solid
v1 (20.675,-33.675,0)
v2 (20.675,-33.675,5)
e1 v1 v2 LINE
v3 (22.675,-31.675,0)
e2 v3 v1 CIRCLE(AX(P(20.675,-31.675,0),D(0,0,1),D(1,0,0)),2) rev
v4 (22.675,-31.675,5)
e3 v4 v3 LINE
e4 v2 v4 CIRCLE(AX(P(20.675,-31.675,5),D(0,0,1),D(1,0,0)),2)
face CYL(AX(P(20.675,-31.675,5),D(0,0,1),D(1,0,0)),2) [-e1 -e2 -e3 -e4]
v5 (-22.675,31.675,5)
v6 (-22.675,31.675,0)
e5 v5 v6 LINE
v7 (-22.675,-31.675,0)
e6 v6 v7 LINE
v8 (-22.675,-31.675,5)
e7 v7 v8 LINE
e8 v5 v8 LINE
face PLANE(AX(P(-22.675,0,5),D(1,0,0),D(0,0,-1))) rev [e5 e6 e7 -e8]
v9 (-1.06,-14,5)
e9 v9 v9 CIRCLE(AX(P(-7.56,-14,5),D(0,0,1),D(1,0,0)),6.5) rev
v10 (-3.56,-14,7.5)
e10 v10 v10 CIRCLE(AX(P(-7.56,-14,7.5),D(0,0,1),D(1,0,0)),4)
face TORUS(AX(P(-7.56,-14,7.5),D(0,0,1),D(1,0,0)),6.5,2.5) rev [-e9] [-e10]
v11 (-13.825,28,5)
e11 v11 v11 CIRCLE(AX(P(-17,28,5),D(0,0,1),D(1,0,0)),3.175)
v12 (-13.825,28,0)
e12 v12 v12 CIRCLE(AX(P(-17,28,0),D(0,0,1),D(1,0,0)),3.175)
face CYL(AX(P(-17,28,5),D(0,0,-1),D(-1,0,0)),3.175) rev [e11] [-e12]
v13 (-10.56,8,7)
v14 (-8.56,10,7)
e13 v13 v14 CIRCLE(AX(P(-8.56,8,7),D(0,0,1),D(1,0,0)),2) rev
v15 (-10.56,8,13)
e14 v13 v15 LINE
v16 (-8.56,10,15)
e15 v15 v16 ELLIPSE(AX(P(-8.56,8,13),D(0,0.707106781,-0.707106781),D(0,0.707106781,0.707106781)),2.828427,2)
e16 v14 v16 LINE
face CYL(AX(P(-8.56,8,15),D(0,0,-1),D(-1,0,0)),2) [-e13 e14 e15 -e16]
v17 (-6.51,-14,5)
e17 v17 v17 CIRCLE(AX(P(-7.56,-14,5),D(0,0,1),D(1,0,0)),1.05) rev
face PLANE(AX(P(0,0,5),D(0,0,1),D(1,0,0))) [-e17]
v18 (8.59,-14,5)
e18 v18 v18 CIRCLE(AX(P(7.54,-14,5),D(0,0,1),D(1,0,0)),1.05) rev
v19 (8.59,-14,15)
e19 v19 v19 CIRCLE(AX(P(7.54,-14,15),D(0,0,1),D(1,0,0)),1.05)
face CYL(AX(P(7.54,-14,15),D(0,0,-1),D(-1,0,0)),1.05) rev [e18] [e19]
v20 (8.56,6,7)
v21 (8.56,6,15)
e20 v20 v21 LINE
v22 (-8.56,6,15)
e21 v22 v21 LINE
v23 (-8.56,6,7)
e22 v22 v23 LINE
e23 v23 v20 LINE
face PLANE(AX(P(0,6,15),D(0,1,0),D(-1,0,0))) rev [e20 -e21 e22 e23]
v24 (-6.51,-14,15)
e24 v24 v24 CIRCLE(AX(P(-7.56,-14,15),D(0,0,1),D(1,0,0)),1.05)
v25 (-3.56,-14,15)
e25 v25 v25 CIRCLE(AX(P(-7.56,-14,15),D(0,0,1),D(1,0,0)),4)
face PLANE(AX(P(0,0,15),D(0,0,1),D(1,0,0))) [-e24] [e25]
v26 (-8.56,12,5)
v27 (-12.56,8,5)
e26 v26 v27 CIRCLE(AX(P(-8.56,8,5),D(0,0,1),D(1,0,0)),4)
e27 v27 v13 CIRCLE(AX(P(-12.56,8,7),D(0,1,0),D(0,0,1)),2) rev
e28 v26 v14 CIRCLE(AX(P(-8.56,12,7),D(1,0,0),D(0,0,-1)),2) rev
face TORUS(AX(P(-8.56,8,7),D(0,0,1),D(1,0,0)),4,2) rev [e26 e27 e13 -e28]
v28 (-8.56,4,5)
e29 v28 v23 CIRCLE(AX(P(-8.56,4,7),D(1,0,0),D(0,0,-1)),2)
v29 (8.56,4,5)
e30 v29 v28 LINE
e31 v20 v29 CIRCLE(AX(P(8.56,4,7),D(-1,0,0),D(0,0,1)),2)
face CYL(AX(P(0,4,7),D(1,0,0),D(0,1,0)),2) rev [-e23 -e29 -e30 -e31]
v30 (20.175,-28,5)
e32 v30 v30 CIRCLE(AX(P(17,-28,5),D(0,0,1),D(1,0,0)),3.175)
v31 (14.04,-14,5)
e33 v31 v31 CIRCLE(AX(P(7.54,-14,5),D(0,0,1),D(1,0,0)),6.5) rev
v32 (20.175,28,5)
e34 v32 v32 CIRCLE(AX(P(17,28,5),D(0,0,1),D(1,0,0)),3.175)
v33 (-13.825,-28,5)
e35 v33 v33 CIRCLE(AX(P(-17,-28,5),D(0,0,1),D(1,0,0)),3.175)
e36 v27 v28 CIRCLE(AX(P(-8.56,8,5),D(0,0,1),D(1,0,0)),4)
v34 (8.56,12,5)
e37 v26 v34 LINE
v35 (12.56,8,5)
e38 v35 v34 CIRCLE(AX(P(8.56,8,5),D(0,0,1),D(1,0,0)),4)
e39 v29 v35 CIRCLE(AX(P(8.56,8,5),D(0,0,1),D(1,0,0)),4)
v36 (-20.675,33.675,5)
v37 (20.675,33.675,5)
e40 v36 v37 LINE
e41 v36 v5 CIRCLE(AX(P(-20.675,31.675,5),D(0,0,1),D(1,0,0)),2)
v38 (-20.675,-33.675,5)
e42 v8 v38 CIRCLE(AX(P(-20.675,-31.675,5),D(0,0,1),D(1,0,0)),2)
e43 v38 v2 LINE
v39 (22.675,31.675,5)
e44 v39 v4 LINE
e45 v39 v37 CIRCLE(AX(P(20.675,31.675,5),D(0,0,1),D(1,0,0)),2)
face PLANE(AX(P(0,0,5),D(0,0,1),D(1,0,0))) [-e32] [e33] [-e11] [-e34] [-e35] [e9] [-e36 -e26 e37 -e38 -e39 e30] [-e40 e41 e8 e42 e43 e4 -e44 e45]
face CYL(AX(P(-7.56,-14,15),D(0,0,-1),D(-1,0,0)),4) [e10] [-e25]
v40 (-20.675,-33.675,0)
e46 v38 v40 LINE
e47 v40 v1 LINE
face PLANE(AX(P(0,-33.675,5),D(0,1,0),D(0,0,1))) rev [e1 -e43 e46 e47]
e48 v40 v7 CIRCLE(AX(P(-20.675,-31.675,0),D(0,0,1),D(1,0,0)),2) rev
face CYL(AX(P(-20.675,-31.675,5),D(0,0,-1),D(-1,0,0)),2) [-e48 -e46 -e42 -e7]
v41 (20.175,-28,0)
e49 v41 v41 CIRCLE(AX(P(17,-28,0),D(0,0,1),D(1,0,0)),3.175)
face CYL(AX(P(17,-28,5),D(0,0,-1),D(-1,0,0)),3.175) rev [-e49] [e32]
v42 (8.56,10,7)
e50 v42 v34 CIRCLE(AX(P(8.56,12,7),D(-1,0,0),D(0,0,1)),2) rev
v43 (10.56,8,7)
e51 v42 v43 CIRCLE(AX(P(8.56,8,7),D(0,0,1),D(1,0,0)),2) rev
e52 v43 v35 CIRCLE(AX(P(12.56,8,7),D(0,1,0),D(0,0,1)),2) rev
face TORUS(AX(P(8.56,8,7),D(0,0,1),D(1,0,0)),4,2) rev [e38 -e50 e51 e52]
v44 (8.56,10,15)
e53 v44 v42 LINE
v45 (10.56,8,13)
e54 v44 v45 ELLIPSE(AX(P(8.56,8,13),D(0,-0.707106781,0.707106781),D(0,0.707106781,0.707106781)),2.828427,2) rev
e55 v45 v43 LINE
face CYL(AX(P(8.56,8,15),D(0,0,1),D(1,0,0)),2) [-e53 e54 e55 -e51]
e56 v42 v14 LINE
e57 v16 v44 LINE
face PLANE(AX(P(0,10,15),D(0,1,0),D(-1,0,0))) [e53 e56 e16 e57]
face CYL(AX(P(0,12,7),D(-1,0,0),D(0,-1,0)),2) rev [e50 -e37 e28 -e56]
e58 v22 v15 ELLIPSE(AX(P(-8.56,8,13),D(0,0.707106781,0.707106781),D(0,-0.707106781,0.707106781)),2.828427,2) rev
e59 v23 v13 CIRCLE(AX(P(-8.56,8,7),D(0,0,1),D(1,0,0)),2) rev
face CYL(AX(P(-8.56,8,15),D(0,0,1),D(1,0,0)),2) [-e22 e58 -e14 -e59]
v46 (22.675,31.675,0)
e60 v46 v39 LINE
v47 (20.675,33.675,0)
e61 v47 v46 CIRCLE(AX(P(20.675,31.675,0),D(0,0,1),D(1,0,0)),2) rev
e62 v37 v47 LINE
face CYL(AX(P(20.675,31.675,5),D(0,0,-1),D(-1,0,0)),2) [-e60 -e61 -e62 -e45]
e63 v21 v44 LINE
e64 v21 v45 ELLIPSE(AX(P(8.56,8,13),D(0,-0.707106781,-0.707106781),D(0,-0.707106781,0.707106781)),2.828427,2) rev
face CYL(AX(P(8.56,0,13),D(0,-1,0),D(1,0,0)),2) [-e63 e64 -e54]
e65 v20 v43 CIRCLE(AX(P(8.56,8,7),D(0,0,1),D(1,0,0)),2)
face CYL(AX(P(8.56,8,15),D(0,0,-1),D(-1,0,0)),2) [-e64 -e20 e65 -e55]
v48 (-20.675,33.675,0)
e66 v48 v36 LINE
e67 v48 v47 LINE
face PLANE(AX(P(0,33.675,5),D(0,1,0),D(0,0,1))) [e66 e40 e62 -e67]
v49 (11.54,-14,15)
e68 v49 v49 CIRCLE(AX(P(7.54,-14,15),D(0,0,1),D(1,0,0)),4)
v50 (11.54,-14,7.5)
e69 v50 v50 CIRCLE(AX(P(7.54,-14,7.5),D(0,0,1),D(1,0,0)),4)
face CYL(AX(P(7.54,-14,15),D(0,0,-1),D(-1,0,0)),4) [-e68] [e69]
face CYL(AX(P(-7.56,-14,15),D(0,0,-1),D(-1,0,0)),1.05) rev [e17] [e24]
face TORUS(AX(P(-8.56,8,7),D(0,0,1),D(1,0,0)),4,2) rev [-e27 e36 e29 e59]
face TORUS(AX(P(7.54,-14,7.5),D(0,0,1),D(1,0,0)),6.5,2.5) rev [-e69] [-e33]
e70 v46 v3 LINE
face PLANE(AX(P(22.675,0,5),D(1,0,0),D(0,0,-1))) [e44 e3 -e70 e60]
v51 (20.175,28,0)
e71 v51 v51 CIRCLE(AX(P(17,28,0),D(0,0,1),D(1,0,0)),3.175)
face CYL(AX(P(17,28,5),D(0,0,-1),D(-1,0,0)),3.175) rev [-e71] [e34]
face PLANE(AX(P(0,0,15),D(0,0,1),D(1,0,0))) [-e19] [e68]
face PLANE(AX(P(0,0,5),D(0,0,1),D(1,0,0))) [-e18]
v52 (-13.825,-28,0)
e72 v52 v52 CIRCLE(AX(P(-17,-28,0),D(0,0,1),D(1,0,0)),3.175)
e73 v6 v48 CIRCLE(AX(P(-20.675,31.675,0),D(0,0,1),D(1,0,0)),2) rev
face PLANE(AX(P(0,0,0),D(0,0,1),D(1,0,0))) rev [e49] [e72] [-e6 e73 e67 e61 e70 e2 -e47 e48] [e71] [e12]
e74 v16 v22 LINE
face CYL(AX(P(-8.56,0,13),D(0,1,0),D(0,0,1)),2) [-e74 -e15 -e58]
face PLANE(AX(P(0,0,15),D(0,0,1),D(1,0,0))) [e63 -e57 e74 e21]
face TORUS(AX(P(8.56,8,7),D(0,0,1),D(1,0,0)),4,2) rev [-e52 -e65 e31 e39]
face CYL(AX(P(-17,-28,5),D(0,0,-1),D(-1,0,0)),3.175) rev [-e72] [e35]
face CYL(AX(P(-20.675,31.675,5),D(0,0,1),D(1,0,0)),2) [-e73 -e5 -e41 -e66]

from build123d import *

# Parameters (mm, degrees)
SKETCH1_W           = 45.35
SKETCH1_H           = 67.35
SKETCH1_R           = 3.175
BOSS_EXTRUDE1_DEPTH = 5
SKETCH2_R           = 4
SKETCH2_R_2         = 1.05
SKETCH2_W           = 21.12
SKETCH2_H           = 4
BOSS_EXTRUDE2_DEPTH = 10
FILLET1_R           = 2
FILLET2_R           = 2
FILLET3_R           = 2.5


with BuildPart() as part:
    # Sketch1 → Boss-Extrude1 (new body)
    with BuildSketch(Plane.XY):
        Rectangle(SKETCH1_W, SKETCH1_H)
        with Locations((-17, 28)):
            Circle(SKETCH1_R, mode=Mode.SUBTRACT)
        with Locations((17, 28)):
            Circle(SKETCH1_R, mode=Mode.SUBTRACT)
        with Locations((17, -28)):
            Circle(SKETCH1_R, mode=Mode.SUBTRACT)
        with Locations((-17, -28)):
            Circle(SKETCH1_R, mode=Mode.SUBTRACT)
    extrude(amount=BOSS_EXTRUDE1_DEPTH)

    # Sketch2 → Boss-Extrude2 (add)
    # profile 1 of 3: a face of its own
    with BuildSketch(Plane.XY.offset(5)):
        with Locations((7.54, -14)):
            Circle(SKETCH2_R)
        with Locations((7.54, -14)):
            Circle(SKETCH2_R_2, mode=Mode.SUBTRACT)
    # profile 2 of 3: a face of its own
    with BuildSketch(Plane.XY.offset(5)):
        with Locations((-7.56, -14)):
            Circle(SKETCH2_R)
        with Locations((-7.56, -14)):
            Circle(SKETCH2_R_2, mode=Mode.SUBTRACT)
    # profile 3 of 3: a face of its own
    with BuildSketch(Plane.XY.offset(5)):
        with Locations((0, 8)):
            Rectangle(SKETCH2_W, SKETCH2_H)
    extrude(amount=BOSS_EXTRUDE2_DEPTH)

    # Fillet1
    fillet1_edges = [part.edges().sort_by_distance(p)[0] for p in [
        (22.675, -33.675, 2.5),
        (-22.675, -33.675, 2.5),
        (-22.675, 33.675, 2.5),
        (22.675, 33.675, 2.5),
    ]]
    fillet(fillet1_edges, radius=FILLET1_R)

    # Fillet2
    fillet2_edges = [part.edges().sort_by_distance(p)[0] for p in [
        (0, 6, 5),
        (-10.56, 6, 10),
        (10.56, 8, 5),
        (10.56, 6, 10),
        (10.56, 10, 10),
        (-10.56, 8, 15),
        (-10.56, 10, 10),
        (10.56, 8, 15),
        (-10.56, 8, 5),
        (0, 10, 5),
    ]]
    fillet(fillet2_edges, radius=FILLET2_R - 0.0001)  # a hair under: the kernel refuses the full size

    # Fillet3
    fillet3_edges = [part.edges().sort_by_distance(p)[0] for p in [
        (3.54, -14, 5),
        (-11.56, -14, 5),
    ]]
    fillet(fillet3_edges, radius=FILLET3_R)


solid = part.part
